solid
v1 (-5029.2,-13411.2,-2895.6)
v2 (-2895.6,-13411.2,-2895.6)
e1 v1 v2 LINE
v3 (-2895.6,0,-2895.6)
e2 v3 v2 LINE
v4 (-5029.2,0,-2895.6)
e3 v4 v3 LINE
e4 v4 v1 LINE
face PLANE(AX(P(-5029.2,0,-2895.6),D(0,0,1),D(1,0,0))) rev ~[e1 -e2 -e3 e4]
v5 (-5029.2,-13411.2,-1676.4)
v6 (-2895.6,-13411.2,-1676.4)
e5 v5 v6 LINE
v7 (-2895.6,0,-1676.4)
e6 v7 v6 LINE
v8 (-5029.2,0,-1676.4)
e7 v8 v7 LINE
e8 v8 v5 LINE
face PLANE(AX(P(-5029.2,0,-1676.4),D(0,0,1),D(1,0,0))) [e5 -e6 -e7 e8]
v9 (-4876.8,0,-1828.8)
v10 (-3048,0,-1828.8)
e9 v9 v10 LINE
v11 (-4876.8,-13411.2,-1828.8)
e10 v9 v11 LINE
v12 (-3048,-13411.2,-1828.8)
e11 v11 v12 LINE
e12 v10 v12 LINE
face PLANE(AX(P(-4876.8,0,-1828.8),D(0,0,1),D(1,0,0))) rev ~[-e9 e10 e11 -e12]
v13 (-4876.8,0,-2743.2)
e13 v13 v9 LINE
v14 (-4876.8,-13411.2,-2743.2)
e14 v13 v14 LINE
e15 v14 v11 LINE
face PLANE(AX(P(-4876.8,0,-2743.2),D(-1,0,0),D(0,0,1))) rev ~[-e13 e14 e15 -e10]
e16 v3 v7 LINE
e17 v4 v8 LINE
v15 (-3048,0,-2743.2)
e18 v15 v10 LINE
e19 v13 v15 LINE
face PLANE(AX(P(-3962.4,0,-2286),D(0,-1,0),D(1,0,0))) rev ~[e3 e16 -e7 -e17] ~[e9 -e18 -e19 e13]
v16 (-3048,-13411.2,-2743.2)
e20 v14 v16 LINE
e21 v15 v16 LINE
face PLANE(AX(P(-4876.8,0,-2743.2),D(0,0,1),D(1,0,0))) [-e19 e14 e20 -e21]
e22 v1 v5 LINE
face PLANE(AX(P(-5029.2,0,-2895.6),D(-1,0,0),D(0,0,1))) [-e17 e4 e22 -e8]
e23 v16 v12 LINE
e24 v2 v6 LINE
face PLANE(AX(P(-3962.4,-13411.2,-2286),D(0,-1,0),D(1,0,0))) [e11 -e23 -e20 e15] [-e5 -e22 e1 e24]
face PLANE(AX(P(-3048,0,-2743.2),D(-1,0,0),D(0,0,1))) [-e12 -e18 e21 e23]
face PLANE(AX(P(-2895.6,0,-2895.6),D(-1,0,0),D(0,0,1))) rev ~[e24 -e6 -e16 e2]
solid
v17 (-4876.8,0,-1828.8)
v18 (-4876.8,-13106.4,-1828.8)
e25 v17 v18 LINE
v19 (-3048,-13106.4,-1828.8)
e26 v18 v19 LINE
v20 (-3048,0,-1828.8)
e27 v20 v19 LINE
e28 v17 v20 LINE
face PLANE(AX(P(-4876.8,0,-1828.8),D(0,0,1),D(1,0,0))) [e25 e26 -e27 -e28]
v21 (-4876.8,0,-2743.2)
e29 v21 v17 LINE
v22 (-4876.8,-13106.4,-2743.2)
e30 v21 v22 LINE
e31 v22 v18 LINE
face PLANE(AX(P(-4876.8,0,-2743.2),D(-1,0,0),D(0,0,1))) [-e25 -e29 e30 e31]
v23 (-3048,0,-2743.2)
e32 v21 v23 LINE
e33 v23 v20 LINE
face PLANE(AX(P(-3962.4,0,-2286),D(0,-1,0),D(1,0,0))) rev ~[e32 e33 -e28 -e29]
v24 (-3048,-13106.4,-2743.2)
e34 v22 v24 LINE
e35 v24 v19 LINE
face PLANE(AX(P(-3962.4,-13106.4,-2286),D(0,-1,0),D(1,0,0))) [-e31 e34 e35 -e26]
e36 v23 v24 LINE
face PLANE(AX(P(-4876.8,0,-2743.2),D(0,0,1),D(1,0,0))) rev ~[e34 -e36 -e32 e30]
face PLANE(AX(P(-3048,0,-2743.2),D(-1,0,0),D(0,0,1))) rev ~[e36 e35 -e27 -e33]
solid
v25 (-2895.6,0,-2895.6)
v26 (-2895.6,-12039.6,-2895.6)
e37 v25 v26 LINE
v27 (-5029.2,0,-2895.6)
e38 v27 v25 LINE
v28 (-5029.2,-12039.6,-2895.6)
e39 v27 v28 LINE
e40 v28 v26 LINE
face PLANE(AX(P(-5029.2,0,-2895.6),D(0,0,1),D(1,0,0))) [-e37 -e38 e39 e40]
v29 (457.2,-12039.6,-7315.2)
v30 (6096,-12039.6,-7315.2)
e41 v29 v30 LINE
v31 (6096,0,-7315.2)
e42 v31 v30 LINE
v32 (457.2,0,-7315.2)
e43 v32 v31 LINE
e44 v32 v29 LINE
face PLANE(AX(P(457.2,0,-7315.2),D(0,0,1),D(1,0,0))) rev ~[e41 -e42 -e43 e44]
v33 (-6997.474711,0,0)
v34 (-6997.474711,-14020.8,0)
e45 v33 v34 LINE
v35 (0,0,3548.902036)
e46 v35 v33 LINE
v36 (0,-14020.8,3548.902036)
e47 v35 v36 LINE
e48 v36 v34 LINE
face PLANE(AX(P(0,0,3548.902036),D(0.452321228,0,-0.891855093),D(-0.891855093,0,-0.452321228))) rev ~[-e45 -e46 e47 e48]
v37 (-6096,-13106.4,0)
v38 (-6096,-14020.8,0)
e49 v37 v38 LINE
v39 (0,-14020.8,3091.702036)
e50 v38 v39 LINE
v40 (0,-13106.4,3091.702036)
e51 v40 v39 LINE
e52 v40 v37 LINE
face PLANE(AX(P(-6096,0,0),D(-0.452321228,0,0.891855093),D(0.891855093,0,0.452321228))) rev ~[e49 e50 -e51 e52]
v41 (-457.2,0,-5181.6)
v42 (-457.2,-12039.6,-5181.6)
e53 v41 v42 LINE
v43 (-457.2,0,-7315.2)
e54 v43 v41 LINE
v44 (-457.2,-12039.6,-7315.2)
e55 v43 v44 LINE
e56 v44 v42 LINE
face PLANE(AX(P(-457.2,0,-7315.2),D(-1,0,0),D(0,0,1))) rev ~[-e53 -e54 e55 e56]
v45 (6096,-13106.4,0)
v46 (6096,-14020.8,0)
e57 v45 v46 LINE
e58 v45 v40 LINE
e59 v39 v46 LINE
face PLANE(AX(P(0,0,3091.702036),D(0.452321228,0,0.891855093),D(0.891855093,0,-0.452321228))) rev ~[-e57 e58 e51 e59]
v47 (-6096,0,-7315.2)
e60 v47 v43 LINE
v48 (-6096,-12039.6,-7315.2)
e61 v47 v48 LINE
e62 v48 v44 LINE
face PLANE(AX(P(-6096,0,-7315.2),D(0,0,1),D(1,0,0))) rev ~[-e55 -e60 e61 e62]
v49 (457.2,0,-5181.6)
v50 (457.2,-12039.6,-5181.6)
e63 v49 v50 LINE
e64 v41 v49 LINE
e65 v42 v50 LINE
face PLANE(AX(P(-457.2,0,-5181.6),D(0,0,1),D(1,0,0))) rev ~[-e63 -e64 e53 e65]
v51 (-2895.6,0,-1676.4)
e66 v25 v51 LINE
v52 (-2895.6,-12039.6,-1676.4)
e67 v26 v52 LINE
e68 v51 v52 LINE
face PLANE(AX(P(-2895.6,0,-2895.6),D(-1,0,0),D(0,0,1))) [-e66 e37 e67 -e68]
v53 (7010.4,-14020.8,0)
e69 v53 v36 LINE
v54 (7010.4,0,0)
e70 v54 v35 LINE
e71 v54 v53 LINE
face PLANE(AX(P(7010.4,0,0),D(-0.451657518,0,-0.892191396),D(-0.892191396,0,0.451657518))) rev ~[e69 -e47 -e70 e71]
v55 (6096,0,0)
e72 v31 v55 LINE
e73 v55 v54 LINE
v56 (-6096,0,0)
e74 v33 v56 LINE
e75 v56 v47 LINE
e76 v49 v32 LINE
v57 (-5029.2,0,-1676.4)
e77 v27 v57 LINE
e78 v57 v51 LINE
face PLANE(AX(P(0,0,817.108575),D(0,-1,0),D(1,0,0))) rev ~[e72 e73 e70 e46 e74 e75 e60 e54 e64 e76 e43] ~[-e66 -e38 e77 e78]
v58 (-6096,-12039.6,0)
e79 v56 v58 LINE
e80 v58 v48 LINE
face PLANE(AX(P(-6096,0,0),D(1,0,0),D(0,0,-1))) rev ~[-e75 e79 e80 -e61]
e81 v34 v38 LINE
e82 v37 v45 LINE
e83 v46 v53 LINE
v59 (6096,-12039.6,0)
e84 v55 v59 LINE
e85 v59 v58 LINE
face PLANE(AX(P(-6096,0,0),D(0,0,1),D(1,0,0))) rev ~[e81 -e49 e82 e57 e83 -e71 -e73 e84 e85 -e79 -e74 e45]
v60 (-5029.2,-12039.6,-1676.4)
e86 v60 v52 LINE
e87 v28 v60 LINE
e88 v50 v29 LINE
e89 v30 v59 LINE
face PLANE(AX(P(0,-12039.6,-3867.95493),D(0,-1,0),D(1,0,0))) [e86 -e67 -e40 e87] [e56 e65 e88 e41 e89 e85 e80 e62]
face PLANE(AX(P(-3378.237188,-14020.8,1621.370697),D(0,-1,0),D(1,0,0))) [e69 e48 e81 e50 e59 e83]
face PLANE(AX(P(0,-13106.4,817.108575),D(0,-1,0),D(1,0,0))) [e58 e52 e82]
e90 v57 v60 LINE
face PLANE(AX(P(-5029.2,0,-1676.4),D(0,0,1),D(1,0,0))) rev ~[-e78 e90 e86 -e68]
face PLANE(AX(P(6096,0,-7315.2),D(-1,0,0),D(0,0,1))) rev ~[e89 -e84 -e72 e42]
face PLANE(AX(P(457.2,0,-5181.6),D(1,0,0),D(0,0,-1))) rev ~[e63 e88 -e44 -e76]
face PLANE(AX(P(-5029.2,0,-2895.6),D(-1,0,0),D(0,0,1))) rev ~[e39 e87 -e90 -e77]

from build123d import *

# Parameters (mm, degrees)
F1_DEPTH = 14020.8
F2_DEPTH = 13106.4
F0_W     = 2133.6
F0_H     = 1219.2
F3_DEPTH = 12039.6
F0_W_2   = 1828.8
F0_H_2   = 914.4
F5_DEPTH = 13106.4
F6_DEPTH = 13411.2


# Not quite as in the source:
# - the program builds the solid bodies; features that only make, move or delete a surface that nothing else refers to are left out


with BuildPart() as f1:
    # F0 (on Front) → F1 (new body)
    with BuildSketch(Plane.XZ):
        Polygon((-6997.4747111522, 0), (-6096, 0), (0, 3091.7020361423), (0, 3548.9020361423), align=None)
        Polygon((0, 3548.9020361423), (0, 3091.7020361423), (6096, 0), (7010.4, 0), align=None)
    extrude(amount=F1_DEPTH)

    # F0 (on Front) → F2 (join)
    with BuildSketch(Plane.XZ):
        Polygon((0, 3091.7020361423), (-6096, 0), (0, 0), (6096, 0), align=None)
    extrude(amount=F2_DEPTH)

    # F0 (on Front) → F3 (join)
    with BuildSketch(Plane.XZ):
        Polygon((0, 0), (-6096, 0), (-6096, -7315.2), (-457.2, -7315.2), (-457.2, -5181.6), (457.2, -5181.6), (457.2, -7315.2), (6096, -7315.2), (6096, 0), align=None)
        with Locations((-3962.4, -2286)):
            Rectangle(F0_W, F0_H, mode=Mode.SUBTRACT)
    extrude(amount=F3_DEPTH)


with BuildPart() as f5:
    # F0 (on Front) → F5 (new body)
    with BuildSketch(Plane.XZ):
        with Locations((-3962.4, -2286)):
            Rectangle(F0_W_2, F0_H_2)
    extrude(amount=F5_DEPTH)


with BuildPart() as f6:
    # F0 (on Front) → F6 (new body)
    with BuildSketch(Plane.XZ):
        with Locations((-3962.4, -2286)):
            Rectangle(F0_W, F0_H)
        with Locations((-3962.4, -2286)):
            Rectangle(F0_W_2, F0_H_2, mode=Mode.SUBTRACT)
    extrude(amount=F6_DEPTH)


solid = Compound([f1.part, f5.part, f6.part])
